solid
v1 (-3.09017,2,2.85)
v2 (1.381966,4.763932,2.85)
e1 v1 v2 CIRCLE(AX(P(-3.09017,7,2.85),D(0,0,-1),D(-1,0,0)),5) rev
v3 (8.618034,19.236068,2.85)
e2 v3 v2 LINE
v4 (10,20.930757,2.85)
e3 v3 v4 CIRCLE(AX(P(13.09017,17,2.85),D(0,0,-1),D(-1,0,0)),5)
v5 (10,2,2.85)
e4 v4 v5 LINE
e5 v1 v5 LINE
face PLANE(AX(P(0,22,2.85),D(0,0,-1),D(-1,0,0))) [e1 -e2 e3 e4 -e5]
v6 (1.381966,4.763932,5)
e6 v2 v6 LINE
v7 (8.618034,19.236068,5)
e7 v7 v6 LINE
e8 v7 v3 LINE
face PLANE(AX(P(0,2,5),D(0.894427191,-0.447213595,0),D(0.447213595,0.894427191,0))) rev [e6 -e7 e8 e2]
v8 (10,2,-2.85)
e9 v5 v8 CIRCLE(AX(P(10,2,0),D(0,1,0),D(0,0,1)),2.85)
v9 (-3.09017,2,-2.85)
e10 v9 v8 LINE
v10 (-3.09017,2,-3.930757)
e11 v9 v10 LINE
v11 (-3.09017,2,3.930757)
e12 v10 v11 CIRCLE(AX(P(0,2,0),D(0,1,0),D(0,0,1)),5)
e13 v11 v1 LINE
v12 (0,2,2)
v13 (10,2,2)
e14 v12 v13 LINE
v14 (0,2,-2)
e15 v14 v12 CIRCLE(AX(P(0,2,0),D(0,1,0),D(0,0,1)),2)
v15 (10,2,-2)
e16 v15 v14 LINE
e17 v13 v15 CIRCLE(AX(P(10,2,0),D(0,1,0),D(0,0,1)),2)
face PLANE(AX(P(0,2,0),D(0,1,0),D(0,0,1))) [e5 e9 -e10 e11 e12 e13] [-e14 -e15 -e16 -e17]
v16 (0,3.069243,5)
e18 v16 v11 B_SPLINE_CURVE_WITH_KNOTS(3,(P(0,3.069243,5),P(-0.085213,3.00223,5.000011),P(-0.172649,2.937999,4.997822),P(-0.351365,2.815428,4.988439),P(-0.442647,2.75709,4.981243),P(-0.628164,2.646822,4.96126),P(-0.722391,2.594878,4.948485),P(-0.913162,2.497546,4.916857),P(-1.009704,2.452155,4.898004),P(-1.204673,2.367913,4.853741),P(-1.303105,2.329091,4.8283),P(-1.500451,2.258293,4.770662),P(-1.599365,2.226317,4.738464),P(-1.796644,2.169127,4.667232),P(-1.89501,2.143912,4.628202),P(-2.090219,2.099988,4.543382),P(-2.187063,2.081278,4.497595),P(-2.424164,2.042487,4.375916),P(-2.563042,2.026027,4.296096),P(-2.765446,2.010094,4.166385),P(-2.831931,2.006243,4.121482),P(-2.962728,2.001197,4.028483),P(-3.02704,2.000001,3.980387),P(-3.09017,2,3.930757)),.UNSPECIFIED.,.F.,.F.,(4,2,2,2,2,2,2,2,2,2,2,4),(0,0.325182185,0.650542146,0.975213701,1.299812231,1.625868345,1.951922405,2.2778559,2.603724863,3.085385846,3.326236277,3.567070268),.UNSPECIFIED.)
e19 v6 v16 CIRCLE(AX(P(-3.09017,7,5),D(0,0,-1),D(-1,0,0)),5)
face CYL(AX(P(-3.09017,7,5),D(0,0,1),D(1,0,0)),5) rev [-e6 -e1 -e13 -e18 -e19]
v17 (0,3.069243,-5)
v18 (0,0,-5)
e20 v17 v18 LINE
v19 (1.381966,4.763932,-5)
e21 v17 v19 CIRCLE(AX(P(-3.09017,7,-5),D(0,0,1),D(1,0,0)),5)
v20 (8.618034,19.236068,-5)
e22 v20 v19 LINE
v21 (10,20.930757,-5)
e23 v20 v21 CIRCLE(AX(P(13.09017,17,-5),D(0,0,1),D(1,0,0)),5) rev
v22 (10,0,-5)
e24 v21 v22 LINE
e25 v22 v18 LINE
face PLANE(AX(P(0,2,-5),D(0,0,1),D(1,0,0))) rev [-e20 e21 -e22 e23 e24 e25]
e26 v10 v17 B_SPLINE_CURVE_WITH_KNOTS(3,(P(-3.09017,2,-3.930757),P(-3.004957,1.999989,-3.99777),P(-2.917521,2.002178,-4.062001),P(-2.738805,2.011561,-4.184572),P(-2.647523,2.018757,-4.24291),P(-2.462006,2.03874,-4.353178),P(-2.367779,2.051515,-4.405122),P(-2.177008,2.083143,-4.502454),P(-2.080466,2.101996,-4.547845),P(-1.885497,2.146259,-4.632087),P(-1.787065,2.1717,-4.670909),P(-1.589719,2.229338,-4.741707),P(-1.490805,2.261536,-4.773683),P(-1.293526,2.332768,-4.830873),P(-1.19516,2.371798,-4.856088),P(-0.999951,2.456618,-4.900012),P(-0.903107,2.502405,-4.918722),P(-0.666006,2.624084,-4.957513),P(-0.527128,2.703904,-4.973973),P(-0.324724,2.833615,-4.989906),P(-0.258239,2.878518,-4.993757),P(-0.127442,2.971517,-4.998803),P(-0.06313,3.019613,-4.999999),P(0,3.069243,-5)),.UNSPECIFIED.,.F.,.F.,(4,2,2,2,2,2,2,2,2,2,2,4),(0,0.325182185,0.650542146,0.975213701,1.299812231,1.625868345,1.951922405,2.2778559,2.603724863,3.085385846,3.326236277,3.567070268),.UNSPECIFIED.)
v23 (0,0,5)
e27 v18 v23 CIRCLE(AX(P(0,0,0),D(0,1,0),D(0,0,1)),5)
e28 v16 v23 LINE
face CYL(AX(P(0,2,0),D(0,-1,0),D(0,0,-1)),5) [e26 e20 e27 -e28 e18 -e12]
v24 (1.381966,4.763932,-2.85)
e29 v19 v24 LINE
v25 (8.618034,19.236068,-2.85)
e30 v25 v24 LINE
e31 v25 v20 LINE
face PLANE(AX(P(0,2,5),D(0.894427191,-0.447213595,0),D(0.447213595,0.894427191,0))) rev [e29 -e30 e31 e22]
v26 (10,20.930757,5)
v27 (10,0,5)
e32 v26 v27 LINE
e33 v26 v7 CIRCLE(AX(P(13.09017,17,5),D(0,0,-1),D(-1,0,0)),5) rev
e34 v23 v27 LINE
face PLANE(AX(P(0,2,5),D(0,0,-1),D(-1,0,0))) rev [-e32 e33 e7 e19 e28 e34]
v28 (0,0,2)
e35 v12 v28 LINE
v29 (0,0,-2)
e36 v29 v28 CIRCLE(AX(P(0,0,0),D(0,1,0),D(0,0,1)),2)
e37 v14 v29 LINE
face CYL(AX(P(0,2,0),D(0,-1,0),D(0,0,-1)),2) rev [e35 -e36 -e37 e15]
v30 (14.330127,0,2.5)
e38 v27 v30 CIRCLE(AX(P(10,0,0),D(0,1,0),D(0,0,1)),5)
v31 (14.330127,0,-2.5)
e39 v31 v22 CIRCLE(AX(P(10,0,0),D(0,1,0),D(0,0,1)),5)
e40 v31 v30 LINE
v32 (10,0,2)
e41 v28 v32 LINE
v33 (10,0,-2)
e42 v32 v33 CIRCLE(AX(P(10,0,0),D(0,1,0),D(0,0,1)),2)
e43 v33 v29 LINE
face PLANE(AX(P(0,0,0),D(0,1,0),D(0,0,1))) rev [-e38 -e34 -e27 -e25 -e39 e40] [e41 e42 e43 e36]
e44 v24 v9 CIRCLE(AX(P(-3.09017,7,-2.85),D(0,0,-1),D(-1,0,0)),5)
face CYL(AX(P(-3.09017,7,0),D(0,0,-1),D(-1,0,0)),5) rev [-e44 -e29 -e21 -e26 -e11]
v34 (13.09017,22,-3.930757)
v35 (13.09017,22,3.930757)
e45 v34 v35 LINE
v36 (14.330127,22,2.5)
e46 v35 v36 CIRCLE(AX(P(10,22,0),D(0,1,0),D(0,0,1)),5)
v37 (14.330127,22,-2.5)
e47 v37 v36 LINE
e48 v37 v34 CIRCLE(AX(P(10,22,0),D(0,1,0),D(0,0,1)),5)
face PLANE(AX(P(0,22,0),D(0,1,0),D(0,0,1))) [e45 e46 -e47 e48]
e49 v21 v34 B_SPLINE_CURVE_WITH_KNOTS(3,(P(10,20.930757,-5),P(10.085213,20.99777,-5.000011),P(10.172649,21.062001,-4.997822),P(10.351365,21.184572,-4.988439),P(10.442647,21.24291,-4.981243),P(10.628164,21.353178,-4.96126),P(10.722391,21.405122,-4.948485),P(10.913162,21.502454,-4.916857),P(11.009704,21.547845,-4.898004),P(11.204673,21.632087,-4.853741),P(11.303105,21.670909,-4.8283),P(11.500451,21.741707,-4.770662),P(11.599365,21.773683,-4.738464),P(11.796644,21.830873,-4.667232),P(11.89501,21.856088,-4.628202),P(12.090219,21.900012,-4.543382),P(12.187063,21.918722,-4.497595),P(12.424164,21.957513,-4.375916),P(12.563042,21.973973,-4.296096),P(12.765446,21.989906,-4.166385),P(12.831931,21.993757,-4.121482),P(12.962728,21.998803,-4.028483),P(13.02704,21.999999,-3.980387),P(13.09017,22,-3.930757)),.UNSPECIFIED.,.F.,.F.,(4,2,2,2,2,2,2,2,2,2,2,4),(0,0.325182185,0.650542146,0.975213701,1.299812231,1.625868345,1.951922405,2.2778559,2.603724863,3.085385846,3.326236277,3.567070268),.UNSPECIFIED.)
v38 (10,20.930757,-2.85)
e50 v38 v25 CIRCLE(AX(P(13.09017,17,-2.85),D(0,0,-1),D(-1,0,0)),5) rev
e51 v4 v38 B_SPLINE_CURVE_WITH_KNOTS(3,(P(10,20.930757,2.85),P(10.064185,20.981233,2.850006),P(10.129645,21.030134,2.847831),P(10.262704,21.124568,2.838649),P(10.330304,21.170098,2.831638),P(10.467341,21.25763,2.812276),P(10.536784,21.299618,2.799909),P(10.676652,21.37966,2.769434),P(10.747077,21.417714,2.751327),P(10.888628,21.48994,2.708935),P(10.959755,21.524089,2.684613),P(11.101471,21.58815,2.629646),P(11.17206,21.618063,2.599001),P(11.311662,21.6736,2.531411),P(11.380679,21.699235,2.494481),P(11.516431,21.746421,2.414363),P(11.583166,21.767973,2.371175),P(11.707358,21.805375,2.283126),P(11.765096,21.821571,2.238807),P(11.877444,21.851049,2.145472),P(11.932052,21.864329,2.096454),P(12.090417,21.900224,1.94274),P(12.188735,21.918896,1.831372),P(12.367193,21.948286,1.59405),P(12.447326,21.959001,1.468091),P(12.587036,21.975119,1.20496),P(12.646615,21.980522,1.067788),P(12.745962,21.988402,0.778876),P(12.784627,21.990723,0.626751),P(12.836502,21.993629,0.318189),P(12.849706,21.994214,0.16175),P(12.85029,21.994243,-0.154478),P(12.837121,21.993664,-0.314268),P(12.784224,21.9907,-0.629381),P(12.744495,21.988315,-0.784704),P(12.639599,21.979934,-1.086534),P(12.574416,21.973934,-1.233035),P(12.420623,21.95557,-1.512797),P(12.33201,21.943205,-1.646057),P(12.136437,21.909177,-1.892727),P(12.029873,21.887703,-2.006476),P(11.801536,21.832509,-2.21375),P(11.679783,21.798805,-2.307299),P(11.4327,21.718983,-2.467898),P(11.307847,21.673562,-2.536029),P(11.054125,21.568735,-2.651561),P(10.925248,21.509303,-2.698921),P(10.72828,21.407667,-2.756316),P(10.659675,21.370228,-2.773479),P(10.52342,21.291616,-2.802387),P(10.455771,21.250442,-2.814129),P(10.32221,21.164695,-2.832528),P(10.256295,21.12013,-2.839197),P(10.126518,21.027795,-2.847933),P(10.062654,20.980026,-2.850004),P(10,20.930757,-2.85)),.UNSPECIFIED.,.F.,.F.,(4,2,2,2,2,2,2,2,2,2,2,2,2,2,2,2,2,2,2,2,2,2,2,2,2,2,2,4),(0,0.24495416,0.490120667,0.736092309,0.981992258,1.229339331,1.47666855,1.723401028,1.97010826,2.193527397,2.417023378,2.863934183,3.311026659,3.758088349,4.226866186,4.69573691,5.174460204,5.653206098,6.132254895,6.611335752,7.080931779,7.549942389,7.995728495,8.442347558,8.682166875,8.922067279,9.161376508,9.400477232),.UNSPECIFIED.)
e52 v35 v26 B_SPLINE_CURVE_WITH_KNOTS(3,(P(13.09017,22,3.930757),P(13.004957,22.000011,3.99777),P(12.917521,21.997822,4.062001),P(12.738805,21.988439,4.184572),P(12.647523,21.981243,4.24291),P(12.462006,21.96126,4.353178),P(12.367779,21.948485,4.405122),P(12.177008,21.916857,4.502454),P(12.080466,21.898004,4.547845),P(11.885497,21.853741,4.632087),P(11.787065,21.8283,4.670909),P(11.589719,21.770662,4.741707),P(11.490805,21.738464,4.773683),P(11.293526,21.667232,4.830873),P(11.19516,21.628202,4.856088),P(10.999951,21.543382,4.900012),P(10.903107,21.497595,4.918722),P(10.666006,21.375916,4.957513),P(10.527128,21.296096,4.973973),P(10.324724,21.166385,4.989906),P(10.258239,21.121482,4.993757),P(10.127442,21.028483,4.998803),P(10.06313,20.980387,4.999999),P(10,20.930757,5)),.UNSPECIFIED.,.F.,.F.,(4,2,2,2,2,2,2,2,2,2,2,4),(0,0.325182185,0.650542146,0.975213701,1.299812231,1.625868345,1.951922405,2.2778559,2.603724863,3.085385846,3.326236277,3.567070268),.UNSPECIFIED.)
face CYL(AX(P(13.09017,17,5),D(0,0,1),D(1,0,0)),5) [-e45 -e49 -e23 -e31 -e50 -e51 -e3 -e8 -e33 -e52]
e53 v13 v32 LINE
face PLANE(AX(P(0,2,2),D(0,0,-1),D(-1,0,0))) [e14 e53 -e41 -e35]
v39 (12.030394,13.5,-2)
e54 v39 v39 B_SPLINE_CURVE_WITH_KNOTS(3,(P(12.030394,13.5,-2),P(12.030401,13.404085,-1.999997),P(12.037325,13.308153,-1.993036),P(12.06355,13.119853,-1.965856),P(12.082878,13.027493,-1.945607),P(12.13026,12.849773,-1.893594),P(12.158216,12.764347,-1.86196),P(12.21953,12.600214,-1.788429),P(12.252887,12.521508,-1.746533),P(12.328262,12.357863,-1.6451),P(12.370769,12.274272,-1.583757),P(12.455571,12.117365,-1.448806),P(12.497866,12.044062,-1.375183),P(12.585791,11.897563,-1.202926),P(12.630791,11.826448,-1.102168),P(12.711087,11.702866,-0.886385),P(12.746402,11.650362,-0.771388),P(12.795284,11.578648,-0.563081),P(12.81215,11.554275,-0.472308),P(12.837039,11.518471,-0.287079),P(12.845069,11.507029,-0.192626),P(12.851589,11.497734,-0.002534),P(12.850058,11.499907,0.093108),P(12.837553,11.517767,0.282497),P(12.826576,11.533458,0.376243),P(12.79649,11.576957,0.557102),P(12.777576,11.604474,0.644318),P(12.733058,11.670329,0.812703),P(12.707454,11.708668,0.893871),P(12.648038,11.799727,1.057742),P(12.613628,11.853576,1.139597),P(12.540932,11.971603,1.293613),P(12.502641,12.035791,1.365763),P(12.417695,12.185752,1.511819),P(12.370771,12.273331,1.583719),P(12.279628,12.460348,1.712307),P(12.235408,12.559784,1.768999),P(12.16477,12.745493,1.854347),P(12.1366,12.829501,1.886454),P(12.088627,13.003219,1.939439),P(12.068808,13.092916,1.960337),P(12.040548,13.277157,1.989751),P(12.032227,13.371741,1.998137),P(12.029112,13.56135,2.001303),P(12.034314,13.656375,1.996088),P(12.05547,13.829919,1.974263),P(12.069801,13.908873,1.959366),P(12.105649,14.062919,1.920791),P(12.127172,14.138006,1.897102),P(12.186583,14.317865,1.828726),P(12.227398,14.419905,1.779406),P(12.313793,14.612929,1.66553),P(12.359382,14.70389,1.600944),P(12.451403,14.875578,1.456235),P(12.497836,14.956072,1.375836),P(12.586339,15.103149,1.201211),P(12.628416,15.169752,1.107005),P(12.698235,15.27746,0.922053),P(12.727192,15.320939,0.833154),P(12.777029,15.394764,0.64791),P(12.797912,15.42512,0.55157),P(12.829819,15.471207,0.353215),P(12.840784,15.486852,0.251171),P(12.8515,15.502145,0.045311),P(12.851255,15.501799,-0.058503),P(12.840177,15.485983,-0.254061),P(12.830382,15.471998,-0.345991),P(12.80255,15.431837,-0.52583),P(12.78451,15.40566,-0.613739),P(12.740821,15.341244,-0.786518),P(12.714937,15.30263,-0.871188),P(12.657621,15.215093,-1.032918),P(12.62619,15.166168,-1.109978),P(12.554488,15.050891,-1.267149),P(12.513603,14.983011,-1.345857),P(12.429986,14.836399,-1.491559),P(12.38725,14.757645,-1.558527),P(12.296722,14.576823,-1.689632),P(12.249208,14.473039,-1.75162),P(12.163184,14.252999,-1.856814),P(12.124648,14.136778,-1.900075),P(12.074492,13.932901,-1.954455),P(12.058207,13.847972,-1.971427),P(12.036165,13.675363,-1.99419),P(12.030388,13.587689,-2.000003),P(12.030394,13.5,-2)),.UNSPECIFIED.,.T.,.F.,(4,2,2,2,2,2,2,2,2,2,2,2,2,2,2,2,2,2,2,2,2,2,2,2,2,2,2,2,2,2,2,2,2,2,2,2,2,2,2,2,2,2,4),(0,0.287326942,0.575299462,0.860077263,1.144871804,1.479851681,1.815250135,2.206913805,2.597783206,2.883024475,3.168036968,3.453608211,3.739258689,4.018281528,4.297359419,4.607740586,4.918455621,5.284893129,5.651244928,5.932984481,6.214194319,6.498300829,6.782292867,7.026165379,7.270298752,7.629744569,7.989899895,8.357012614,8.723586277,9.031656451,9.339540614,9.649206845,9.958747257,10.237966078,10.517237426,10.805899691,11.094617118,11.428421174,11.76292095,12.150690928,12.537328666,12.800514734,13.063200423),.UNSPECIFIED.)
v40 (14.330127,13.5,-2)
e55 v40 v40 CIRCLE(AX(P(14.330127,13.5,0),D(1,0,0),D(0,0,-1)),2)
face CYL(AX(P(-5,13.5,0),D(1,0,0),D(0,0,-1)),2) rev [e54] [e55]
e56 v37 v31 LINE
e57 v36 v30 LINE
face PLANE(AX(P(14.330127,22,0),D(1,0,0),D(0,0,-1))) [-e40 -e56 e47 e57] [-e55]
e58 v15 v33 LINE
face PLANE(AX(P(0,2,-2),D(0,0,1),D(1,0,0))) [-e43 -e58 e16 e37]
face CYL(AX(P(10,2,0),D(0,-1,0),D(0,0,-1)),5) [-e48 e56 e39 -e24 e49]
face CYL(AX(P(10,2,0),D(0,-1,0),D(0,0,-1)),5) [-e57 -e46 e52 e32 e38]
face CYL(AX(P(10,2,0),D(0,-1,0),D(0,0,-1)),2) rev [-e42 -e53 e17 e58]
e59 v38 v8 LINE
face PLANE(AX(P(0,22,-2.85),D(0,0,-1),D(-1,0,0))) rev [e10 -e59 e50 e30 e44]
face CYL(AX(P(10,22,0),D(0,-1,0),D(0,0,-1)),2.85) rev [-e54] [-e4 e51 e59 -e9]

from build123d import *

# Parameters (mm, degrees)
BOSS_EXTRUDE1_DEPTH = 2
SKETCH2_W           = 10
SKETCH2_H           = 2.15
BOSS_EXTRUDE2_DEPTH = 20
CUT_EXTRUDE1_DEPTH  = 29.442925307
FILLET1_START       = -6
FILLET1_DEPTH       = 12
FILLET1_START_2     = 2.85
FILLET1_2_DEPTH     = 1.775923077
FILLET1_START_3     = -4.604846154
FILLET1_3_DEPTH     = 1.754846154
FILLET1_START_4     = -5
FILLET1_4_DEPTH     = 0.395153846
FILLET1_START_5     = 4.625923077
FILLET1_5_DEPTH     = 0.374076923
FILLET1_START_6     = 2
FILLET1_6_DEPTH     = 2.763932023
CUT_EXTRUDE2_DEPTH  = 28.092434523
SKETCH5_R           = 2
CUT_EXTRUDE3_DEPTH  = 30.709490335


with BuildPart() as part:
    # Sketch1 → Boss-Extrude1 (new body)
    with BuildSketch(Plane(origin=(0, 0, 0), x_dir=(1, 0, 0), z_dir=(0, 1, 0))):
        with BuildLine():
            Line((0, 5), (10, 5))
            ThreePointArc((10, 5), (15, 0), (10, -5))
            Line((10, -5), (0, -5))
            ThreePointArc((0, -5), (-5, 0), (0, 5))
        make_face()
        with BuildLine():
            Line((0, 2), (10, 2))
            ThreePointArc((10, 2), (12, 0), (10, -2))
            Line((10, -2), (0, -2))
            ThreePointArc((0, -2), (-2, 0), (0, 2))
        make_face(mode=Mode.SUBTRACT)
    extrude(amount=BOSS_EXTRUDE1_DEPTH)

    # Sketch2 → Boss-Extrude2 (add)
    with BuildSketch(Plane(origin=(0, 2, 0), x_dir=(1, 0, 0), z_dir=(0, 1, 0))):
        with BuildLine():
            ThreePointArc((10, -2.85), (12.85, 0), (10, 2.85))
            Line((10, 2.85), (10, 5))
            ThreePointArc((10, 5), (15, 0), (10, -5))
            Line((10, -5), (10, -2.85))
        make_face()
        with Locations((5, 3.925)):
            Rectangle(SKETCH2_W, SKETCH2_H)
        with Locations((5, -3.925)):
            Rectangle(SKETCH2_W, SKETCH2_H)
    extrude(amount=BOSS_EXTRUDE2_DEPTH)

    # Sketch3 → Cut-Extrude1 (cut, through all)
    with BuildSketch(Plane(origin=(0, 0, -5), x_dir=(-1, 0, 0), z_dir=(0, 0, -1))):
        Polygon((0, 2), (-10, 22), (0, 22), align=None)
    extrude(amount=-CUT_EXTRUDE1_DEPTH, mode=Mode.SUBTRACT)

    # Fillet1: read off the stored shape, not the designer's step
    # Fillet1 outline → Fillet1 (cut)
    with BuildSketch(Plane.XY.offset(FILLET1_START)):
        with BuildLine():
            ThreePointArc((8.618033989, 19.236067977), (10.461514383, 21.253254042), (13.090169944, 22))
            Line((13.090169944, 22), (10, 22))
            Line((10, 22), (8.618033989, 19.236067977))
        make_face()
    extrude(amount=FILLET1_DEPTH, mode=Mode.SUBTRACT)

    # Fillet1 2 outline → Fillet1 2 (add)
    with BuildSketch(Plane.XY.offset(FILLET1_START_2)):
        with BuildLine():
            Line((0, 2), (1.381966011, 4.763932023))
            ThreePointArc((1.381966011, 4.763932023), (-0.461514383, 2.746745958), (-3.090169944, 2))
            Line((-3.090169944, 2), (0, 2))
        make_face()
    extrude(amount=FILLET1_2_DEPTH)

    # Fillet1 3 outline → Fillet1 3 (add)
    with BuildSketch(Plane.XY.offset(FILLET1_START_3)):
        with BuildLine():
            Line((0, 2), (1.381966011, 4.763932023))
            ThreePointArc((1.381966011, 4.763932023), (-0.461514383, 2.746745958), (-3.090169944, 2))
            Line((-3.090169944, 2), (0, 2))
        make_face()
    extrude(amount=FILLET1_3_DEPTH)

    # Fillet1 4 outline → Fillet1 4 (add)
    with BuildSketch(Plane.XY.offset(FILLET1_START_4)):
        with BuildLine():
            Line((0, 2), (1.381966011, 4.763932023))
            ThreePointArc((1.381966011, 4.763932023), (-0.461514383, 2.746745958), (-3.090169944, 2))
            Line((-3.090169944, 2), (0, 2))
        make_face()
    extrude(amount=FILLET1_4_DEPTH)

    # Fillet1 5 outline → Fillet1 5 (add)
    with BuildSketch(Plane.XY.offset(FILLET1_START_5)):
        with BuildLine():
            Line((0, 2), (1.381966011, 4.763932023))
            ThreePointArc((1.381966011, 4.763932023), (-0.461514383, 2.746745958), (-3.090169944, 2))
            Line((-3.090169944, 2), (0, 2))
        make_face()
    extrude(amount=FILLET1_5_DEPTH)

    # Fillet1 6 outline → Fillet1 6 (cut)
    with BuildSketch(Plane(origin=(0, 0, 0), x_dir=(1, 0, 0), z_dir=(0, 1, 0)).offset(FILLET1_START_6)):
        with BuildLine():
            Line((-5, -5), (0, -5))
            ThreePointArc((0, -5), (-3.535533906, -3.535533906), (-5, 0))
            Line((-5, 0), (-5, -5))
        make_face()
        with BuildLine():
            Line((-5, 5), (-5, 0))
            ThreePointArc((-5, 0), (-3.535533906, 3.535533906), (0, 5))
            Line((0, 5), (-5, 5))
        make_face()
    extrude(amount=FILLET1_6_DEPTH, mode=Mode.SUBTRACT)

    # Sketch4 → Cut-Extrude2 (cut, through all)
    with BuildSketch(Plane.XZ):
        with BuildLine():
            Line((14.330127019, 2.5), (14.330127019, -2.5))
            ThreePointArc((14.330127019, -2.5), (15, 0), (14.330127019, 2.5))
        make_face()
    extrude(amount=-CUT_EXTRUDE2_DEPTH, mode=Mode.SUBTRACT)

    # Sketch5 → Cut-Extrude3 (cut, through all)
    with BuildSketch(Plane(origin=(14.330127019, 0, 0), x_dir=(0, 0, -1), z_dir=(1, 0, 0))):
        with Locations((0, 13.5)):
            Circle(SKETCH5_R)
    extrude(amount=-CUT_EXTRUDE3_DEPTH, mode=Mode.SUBTRACT)


solid = part.part
